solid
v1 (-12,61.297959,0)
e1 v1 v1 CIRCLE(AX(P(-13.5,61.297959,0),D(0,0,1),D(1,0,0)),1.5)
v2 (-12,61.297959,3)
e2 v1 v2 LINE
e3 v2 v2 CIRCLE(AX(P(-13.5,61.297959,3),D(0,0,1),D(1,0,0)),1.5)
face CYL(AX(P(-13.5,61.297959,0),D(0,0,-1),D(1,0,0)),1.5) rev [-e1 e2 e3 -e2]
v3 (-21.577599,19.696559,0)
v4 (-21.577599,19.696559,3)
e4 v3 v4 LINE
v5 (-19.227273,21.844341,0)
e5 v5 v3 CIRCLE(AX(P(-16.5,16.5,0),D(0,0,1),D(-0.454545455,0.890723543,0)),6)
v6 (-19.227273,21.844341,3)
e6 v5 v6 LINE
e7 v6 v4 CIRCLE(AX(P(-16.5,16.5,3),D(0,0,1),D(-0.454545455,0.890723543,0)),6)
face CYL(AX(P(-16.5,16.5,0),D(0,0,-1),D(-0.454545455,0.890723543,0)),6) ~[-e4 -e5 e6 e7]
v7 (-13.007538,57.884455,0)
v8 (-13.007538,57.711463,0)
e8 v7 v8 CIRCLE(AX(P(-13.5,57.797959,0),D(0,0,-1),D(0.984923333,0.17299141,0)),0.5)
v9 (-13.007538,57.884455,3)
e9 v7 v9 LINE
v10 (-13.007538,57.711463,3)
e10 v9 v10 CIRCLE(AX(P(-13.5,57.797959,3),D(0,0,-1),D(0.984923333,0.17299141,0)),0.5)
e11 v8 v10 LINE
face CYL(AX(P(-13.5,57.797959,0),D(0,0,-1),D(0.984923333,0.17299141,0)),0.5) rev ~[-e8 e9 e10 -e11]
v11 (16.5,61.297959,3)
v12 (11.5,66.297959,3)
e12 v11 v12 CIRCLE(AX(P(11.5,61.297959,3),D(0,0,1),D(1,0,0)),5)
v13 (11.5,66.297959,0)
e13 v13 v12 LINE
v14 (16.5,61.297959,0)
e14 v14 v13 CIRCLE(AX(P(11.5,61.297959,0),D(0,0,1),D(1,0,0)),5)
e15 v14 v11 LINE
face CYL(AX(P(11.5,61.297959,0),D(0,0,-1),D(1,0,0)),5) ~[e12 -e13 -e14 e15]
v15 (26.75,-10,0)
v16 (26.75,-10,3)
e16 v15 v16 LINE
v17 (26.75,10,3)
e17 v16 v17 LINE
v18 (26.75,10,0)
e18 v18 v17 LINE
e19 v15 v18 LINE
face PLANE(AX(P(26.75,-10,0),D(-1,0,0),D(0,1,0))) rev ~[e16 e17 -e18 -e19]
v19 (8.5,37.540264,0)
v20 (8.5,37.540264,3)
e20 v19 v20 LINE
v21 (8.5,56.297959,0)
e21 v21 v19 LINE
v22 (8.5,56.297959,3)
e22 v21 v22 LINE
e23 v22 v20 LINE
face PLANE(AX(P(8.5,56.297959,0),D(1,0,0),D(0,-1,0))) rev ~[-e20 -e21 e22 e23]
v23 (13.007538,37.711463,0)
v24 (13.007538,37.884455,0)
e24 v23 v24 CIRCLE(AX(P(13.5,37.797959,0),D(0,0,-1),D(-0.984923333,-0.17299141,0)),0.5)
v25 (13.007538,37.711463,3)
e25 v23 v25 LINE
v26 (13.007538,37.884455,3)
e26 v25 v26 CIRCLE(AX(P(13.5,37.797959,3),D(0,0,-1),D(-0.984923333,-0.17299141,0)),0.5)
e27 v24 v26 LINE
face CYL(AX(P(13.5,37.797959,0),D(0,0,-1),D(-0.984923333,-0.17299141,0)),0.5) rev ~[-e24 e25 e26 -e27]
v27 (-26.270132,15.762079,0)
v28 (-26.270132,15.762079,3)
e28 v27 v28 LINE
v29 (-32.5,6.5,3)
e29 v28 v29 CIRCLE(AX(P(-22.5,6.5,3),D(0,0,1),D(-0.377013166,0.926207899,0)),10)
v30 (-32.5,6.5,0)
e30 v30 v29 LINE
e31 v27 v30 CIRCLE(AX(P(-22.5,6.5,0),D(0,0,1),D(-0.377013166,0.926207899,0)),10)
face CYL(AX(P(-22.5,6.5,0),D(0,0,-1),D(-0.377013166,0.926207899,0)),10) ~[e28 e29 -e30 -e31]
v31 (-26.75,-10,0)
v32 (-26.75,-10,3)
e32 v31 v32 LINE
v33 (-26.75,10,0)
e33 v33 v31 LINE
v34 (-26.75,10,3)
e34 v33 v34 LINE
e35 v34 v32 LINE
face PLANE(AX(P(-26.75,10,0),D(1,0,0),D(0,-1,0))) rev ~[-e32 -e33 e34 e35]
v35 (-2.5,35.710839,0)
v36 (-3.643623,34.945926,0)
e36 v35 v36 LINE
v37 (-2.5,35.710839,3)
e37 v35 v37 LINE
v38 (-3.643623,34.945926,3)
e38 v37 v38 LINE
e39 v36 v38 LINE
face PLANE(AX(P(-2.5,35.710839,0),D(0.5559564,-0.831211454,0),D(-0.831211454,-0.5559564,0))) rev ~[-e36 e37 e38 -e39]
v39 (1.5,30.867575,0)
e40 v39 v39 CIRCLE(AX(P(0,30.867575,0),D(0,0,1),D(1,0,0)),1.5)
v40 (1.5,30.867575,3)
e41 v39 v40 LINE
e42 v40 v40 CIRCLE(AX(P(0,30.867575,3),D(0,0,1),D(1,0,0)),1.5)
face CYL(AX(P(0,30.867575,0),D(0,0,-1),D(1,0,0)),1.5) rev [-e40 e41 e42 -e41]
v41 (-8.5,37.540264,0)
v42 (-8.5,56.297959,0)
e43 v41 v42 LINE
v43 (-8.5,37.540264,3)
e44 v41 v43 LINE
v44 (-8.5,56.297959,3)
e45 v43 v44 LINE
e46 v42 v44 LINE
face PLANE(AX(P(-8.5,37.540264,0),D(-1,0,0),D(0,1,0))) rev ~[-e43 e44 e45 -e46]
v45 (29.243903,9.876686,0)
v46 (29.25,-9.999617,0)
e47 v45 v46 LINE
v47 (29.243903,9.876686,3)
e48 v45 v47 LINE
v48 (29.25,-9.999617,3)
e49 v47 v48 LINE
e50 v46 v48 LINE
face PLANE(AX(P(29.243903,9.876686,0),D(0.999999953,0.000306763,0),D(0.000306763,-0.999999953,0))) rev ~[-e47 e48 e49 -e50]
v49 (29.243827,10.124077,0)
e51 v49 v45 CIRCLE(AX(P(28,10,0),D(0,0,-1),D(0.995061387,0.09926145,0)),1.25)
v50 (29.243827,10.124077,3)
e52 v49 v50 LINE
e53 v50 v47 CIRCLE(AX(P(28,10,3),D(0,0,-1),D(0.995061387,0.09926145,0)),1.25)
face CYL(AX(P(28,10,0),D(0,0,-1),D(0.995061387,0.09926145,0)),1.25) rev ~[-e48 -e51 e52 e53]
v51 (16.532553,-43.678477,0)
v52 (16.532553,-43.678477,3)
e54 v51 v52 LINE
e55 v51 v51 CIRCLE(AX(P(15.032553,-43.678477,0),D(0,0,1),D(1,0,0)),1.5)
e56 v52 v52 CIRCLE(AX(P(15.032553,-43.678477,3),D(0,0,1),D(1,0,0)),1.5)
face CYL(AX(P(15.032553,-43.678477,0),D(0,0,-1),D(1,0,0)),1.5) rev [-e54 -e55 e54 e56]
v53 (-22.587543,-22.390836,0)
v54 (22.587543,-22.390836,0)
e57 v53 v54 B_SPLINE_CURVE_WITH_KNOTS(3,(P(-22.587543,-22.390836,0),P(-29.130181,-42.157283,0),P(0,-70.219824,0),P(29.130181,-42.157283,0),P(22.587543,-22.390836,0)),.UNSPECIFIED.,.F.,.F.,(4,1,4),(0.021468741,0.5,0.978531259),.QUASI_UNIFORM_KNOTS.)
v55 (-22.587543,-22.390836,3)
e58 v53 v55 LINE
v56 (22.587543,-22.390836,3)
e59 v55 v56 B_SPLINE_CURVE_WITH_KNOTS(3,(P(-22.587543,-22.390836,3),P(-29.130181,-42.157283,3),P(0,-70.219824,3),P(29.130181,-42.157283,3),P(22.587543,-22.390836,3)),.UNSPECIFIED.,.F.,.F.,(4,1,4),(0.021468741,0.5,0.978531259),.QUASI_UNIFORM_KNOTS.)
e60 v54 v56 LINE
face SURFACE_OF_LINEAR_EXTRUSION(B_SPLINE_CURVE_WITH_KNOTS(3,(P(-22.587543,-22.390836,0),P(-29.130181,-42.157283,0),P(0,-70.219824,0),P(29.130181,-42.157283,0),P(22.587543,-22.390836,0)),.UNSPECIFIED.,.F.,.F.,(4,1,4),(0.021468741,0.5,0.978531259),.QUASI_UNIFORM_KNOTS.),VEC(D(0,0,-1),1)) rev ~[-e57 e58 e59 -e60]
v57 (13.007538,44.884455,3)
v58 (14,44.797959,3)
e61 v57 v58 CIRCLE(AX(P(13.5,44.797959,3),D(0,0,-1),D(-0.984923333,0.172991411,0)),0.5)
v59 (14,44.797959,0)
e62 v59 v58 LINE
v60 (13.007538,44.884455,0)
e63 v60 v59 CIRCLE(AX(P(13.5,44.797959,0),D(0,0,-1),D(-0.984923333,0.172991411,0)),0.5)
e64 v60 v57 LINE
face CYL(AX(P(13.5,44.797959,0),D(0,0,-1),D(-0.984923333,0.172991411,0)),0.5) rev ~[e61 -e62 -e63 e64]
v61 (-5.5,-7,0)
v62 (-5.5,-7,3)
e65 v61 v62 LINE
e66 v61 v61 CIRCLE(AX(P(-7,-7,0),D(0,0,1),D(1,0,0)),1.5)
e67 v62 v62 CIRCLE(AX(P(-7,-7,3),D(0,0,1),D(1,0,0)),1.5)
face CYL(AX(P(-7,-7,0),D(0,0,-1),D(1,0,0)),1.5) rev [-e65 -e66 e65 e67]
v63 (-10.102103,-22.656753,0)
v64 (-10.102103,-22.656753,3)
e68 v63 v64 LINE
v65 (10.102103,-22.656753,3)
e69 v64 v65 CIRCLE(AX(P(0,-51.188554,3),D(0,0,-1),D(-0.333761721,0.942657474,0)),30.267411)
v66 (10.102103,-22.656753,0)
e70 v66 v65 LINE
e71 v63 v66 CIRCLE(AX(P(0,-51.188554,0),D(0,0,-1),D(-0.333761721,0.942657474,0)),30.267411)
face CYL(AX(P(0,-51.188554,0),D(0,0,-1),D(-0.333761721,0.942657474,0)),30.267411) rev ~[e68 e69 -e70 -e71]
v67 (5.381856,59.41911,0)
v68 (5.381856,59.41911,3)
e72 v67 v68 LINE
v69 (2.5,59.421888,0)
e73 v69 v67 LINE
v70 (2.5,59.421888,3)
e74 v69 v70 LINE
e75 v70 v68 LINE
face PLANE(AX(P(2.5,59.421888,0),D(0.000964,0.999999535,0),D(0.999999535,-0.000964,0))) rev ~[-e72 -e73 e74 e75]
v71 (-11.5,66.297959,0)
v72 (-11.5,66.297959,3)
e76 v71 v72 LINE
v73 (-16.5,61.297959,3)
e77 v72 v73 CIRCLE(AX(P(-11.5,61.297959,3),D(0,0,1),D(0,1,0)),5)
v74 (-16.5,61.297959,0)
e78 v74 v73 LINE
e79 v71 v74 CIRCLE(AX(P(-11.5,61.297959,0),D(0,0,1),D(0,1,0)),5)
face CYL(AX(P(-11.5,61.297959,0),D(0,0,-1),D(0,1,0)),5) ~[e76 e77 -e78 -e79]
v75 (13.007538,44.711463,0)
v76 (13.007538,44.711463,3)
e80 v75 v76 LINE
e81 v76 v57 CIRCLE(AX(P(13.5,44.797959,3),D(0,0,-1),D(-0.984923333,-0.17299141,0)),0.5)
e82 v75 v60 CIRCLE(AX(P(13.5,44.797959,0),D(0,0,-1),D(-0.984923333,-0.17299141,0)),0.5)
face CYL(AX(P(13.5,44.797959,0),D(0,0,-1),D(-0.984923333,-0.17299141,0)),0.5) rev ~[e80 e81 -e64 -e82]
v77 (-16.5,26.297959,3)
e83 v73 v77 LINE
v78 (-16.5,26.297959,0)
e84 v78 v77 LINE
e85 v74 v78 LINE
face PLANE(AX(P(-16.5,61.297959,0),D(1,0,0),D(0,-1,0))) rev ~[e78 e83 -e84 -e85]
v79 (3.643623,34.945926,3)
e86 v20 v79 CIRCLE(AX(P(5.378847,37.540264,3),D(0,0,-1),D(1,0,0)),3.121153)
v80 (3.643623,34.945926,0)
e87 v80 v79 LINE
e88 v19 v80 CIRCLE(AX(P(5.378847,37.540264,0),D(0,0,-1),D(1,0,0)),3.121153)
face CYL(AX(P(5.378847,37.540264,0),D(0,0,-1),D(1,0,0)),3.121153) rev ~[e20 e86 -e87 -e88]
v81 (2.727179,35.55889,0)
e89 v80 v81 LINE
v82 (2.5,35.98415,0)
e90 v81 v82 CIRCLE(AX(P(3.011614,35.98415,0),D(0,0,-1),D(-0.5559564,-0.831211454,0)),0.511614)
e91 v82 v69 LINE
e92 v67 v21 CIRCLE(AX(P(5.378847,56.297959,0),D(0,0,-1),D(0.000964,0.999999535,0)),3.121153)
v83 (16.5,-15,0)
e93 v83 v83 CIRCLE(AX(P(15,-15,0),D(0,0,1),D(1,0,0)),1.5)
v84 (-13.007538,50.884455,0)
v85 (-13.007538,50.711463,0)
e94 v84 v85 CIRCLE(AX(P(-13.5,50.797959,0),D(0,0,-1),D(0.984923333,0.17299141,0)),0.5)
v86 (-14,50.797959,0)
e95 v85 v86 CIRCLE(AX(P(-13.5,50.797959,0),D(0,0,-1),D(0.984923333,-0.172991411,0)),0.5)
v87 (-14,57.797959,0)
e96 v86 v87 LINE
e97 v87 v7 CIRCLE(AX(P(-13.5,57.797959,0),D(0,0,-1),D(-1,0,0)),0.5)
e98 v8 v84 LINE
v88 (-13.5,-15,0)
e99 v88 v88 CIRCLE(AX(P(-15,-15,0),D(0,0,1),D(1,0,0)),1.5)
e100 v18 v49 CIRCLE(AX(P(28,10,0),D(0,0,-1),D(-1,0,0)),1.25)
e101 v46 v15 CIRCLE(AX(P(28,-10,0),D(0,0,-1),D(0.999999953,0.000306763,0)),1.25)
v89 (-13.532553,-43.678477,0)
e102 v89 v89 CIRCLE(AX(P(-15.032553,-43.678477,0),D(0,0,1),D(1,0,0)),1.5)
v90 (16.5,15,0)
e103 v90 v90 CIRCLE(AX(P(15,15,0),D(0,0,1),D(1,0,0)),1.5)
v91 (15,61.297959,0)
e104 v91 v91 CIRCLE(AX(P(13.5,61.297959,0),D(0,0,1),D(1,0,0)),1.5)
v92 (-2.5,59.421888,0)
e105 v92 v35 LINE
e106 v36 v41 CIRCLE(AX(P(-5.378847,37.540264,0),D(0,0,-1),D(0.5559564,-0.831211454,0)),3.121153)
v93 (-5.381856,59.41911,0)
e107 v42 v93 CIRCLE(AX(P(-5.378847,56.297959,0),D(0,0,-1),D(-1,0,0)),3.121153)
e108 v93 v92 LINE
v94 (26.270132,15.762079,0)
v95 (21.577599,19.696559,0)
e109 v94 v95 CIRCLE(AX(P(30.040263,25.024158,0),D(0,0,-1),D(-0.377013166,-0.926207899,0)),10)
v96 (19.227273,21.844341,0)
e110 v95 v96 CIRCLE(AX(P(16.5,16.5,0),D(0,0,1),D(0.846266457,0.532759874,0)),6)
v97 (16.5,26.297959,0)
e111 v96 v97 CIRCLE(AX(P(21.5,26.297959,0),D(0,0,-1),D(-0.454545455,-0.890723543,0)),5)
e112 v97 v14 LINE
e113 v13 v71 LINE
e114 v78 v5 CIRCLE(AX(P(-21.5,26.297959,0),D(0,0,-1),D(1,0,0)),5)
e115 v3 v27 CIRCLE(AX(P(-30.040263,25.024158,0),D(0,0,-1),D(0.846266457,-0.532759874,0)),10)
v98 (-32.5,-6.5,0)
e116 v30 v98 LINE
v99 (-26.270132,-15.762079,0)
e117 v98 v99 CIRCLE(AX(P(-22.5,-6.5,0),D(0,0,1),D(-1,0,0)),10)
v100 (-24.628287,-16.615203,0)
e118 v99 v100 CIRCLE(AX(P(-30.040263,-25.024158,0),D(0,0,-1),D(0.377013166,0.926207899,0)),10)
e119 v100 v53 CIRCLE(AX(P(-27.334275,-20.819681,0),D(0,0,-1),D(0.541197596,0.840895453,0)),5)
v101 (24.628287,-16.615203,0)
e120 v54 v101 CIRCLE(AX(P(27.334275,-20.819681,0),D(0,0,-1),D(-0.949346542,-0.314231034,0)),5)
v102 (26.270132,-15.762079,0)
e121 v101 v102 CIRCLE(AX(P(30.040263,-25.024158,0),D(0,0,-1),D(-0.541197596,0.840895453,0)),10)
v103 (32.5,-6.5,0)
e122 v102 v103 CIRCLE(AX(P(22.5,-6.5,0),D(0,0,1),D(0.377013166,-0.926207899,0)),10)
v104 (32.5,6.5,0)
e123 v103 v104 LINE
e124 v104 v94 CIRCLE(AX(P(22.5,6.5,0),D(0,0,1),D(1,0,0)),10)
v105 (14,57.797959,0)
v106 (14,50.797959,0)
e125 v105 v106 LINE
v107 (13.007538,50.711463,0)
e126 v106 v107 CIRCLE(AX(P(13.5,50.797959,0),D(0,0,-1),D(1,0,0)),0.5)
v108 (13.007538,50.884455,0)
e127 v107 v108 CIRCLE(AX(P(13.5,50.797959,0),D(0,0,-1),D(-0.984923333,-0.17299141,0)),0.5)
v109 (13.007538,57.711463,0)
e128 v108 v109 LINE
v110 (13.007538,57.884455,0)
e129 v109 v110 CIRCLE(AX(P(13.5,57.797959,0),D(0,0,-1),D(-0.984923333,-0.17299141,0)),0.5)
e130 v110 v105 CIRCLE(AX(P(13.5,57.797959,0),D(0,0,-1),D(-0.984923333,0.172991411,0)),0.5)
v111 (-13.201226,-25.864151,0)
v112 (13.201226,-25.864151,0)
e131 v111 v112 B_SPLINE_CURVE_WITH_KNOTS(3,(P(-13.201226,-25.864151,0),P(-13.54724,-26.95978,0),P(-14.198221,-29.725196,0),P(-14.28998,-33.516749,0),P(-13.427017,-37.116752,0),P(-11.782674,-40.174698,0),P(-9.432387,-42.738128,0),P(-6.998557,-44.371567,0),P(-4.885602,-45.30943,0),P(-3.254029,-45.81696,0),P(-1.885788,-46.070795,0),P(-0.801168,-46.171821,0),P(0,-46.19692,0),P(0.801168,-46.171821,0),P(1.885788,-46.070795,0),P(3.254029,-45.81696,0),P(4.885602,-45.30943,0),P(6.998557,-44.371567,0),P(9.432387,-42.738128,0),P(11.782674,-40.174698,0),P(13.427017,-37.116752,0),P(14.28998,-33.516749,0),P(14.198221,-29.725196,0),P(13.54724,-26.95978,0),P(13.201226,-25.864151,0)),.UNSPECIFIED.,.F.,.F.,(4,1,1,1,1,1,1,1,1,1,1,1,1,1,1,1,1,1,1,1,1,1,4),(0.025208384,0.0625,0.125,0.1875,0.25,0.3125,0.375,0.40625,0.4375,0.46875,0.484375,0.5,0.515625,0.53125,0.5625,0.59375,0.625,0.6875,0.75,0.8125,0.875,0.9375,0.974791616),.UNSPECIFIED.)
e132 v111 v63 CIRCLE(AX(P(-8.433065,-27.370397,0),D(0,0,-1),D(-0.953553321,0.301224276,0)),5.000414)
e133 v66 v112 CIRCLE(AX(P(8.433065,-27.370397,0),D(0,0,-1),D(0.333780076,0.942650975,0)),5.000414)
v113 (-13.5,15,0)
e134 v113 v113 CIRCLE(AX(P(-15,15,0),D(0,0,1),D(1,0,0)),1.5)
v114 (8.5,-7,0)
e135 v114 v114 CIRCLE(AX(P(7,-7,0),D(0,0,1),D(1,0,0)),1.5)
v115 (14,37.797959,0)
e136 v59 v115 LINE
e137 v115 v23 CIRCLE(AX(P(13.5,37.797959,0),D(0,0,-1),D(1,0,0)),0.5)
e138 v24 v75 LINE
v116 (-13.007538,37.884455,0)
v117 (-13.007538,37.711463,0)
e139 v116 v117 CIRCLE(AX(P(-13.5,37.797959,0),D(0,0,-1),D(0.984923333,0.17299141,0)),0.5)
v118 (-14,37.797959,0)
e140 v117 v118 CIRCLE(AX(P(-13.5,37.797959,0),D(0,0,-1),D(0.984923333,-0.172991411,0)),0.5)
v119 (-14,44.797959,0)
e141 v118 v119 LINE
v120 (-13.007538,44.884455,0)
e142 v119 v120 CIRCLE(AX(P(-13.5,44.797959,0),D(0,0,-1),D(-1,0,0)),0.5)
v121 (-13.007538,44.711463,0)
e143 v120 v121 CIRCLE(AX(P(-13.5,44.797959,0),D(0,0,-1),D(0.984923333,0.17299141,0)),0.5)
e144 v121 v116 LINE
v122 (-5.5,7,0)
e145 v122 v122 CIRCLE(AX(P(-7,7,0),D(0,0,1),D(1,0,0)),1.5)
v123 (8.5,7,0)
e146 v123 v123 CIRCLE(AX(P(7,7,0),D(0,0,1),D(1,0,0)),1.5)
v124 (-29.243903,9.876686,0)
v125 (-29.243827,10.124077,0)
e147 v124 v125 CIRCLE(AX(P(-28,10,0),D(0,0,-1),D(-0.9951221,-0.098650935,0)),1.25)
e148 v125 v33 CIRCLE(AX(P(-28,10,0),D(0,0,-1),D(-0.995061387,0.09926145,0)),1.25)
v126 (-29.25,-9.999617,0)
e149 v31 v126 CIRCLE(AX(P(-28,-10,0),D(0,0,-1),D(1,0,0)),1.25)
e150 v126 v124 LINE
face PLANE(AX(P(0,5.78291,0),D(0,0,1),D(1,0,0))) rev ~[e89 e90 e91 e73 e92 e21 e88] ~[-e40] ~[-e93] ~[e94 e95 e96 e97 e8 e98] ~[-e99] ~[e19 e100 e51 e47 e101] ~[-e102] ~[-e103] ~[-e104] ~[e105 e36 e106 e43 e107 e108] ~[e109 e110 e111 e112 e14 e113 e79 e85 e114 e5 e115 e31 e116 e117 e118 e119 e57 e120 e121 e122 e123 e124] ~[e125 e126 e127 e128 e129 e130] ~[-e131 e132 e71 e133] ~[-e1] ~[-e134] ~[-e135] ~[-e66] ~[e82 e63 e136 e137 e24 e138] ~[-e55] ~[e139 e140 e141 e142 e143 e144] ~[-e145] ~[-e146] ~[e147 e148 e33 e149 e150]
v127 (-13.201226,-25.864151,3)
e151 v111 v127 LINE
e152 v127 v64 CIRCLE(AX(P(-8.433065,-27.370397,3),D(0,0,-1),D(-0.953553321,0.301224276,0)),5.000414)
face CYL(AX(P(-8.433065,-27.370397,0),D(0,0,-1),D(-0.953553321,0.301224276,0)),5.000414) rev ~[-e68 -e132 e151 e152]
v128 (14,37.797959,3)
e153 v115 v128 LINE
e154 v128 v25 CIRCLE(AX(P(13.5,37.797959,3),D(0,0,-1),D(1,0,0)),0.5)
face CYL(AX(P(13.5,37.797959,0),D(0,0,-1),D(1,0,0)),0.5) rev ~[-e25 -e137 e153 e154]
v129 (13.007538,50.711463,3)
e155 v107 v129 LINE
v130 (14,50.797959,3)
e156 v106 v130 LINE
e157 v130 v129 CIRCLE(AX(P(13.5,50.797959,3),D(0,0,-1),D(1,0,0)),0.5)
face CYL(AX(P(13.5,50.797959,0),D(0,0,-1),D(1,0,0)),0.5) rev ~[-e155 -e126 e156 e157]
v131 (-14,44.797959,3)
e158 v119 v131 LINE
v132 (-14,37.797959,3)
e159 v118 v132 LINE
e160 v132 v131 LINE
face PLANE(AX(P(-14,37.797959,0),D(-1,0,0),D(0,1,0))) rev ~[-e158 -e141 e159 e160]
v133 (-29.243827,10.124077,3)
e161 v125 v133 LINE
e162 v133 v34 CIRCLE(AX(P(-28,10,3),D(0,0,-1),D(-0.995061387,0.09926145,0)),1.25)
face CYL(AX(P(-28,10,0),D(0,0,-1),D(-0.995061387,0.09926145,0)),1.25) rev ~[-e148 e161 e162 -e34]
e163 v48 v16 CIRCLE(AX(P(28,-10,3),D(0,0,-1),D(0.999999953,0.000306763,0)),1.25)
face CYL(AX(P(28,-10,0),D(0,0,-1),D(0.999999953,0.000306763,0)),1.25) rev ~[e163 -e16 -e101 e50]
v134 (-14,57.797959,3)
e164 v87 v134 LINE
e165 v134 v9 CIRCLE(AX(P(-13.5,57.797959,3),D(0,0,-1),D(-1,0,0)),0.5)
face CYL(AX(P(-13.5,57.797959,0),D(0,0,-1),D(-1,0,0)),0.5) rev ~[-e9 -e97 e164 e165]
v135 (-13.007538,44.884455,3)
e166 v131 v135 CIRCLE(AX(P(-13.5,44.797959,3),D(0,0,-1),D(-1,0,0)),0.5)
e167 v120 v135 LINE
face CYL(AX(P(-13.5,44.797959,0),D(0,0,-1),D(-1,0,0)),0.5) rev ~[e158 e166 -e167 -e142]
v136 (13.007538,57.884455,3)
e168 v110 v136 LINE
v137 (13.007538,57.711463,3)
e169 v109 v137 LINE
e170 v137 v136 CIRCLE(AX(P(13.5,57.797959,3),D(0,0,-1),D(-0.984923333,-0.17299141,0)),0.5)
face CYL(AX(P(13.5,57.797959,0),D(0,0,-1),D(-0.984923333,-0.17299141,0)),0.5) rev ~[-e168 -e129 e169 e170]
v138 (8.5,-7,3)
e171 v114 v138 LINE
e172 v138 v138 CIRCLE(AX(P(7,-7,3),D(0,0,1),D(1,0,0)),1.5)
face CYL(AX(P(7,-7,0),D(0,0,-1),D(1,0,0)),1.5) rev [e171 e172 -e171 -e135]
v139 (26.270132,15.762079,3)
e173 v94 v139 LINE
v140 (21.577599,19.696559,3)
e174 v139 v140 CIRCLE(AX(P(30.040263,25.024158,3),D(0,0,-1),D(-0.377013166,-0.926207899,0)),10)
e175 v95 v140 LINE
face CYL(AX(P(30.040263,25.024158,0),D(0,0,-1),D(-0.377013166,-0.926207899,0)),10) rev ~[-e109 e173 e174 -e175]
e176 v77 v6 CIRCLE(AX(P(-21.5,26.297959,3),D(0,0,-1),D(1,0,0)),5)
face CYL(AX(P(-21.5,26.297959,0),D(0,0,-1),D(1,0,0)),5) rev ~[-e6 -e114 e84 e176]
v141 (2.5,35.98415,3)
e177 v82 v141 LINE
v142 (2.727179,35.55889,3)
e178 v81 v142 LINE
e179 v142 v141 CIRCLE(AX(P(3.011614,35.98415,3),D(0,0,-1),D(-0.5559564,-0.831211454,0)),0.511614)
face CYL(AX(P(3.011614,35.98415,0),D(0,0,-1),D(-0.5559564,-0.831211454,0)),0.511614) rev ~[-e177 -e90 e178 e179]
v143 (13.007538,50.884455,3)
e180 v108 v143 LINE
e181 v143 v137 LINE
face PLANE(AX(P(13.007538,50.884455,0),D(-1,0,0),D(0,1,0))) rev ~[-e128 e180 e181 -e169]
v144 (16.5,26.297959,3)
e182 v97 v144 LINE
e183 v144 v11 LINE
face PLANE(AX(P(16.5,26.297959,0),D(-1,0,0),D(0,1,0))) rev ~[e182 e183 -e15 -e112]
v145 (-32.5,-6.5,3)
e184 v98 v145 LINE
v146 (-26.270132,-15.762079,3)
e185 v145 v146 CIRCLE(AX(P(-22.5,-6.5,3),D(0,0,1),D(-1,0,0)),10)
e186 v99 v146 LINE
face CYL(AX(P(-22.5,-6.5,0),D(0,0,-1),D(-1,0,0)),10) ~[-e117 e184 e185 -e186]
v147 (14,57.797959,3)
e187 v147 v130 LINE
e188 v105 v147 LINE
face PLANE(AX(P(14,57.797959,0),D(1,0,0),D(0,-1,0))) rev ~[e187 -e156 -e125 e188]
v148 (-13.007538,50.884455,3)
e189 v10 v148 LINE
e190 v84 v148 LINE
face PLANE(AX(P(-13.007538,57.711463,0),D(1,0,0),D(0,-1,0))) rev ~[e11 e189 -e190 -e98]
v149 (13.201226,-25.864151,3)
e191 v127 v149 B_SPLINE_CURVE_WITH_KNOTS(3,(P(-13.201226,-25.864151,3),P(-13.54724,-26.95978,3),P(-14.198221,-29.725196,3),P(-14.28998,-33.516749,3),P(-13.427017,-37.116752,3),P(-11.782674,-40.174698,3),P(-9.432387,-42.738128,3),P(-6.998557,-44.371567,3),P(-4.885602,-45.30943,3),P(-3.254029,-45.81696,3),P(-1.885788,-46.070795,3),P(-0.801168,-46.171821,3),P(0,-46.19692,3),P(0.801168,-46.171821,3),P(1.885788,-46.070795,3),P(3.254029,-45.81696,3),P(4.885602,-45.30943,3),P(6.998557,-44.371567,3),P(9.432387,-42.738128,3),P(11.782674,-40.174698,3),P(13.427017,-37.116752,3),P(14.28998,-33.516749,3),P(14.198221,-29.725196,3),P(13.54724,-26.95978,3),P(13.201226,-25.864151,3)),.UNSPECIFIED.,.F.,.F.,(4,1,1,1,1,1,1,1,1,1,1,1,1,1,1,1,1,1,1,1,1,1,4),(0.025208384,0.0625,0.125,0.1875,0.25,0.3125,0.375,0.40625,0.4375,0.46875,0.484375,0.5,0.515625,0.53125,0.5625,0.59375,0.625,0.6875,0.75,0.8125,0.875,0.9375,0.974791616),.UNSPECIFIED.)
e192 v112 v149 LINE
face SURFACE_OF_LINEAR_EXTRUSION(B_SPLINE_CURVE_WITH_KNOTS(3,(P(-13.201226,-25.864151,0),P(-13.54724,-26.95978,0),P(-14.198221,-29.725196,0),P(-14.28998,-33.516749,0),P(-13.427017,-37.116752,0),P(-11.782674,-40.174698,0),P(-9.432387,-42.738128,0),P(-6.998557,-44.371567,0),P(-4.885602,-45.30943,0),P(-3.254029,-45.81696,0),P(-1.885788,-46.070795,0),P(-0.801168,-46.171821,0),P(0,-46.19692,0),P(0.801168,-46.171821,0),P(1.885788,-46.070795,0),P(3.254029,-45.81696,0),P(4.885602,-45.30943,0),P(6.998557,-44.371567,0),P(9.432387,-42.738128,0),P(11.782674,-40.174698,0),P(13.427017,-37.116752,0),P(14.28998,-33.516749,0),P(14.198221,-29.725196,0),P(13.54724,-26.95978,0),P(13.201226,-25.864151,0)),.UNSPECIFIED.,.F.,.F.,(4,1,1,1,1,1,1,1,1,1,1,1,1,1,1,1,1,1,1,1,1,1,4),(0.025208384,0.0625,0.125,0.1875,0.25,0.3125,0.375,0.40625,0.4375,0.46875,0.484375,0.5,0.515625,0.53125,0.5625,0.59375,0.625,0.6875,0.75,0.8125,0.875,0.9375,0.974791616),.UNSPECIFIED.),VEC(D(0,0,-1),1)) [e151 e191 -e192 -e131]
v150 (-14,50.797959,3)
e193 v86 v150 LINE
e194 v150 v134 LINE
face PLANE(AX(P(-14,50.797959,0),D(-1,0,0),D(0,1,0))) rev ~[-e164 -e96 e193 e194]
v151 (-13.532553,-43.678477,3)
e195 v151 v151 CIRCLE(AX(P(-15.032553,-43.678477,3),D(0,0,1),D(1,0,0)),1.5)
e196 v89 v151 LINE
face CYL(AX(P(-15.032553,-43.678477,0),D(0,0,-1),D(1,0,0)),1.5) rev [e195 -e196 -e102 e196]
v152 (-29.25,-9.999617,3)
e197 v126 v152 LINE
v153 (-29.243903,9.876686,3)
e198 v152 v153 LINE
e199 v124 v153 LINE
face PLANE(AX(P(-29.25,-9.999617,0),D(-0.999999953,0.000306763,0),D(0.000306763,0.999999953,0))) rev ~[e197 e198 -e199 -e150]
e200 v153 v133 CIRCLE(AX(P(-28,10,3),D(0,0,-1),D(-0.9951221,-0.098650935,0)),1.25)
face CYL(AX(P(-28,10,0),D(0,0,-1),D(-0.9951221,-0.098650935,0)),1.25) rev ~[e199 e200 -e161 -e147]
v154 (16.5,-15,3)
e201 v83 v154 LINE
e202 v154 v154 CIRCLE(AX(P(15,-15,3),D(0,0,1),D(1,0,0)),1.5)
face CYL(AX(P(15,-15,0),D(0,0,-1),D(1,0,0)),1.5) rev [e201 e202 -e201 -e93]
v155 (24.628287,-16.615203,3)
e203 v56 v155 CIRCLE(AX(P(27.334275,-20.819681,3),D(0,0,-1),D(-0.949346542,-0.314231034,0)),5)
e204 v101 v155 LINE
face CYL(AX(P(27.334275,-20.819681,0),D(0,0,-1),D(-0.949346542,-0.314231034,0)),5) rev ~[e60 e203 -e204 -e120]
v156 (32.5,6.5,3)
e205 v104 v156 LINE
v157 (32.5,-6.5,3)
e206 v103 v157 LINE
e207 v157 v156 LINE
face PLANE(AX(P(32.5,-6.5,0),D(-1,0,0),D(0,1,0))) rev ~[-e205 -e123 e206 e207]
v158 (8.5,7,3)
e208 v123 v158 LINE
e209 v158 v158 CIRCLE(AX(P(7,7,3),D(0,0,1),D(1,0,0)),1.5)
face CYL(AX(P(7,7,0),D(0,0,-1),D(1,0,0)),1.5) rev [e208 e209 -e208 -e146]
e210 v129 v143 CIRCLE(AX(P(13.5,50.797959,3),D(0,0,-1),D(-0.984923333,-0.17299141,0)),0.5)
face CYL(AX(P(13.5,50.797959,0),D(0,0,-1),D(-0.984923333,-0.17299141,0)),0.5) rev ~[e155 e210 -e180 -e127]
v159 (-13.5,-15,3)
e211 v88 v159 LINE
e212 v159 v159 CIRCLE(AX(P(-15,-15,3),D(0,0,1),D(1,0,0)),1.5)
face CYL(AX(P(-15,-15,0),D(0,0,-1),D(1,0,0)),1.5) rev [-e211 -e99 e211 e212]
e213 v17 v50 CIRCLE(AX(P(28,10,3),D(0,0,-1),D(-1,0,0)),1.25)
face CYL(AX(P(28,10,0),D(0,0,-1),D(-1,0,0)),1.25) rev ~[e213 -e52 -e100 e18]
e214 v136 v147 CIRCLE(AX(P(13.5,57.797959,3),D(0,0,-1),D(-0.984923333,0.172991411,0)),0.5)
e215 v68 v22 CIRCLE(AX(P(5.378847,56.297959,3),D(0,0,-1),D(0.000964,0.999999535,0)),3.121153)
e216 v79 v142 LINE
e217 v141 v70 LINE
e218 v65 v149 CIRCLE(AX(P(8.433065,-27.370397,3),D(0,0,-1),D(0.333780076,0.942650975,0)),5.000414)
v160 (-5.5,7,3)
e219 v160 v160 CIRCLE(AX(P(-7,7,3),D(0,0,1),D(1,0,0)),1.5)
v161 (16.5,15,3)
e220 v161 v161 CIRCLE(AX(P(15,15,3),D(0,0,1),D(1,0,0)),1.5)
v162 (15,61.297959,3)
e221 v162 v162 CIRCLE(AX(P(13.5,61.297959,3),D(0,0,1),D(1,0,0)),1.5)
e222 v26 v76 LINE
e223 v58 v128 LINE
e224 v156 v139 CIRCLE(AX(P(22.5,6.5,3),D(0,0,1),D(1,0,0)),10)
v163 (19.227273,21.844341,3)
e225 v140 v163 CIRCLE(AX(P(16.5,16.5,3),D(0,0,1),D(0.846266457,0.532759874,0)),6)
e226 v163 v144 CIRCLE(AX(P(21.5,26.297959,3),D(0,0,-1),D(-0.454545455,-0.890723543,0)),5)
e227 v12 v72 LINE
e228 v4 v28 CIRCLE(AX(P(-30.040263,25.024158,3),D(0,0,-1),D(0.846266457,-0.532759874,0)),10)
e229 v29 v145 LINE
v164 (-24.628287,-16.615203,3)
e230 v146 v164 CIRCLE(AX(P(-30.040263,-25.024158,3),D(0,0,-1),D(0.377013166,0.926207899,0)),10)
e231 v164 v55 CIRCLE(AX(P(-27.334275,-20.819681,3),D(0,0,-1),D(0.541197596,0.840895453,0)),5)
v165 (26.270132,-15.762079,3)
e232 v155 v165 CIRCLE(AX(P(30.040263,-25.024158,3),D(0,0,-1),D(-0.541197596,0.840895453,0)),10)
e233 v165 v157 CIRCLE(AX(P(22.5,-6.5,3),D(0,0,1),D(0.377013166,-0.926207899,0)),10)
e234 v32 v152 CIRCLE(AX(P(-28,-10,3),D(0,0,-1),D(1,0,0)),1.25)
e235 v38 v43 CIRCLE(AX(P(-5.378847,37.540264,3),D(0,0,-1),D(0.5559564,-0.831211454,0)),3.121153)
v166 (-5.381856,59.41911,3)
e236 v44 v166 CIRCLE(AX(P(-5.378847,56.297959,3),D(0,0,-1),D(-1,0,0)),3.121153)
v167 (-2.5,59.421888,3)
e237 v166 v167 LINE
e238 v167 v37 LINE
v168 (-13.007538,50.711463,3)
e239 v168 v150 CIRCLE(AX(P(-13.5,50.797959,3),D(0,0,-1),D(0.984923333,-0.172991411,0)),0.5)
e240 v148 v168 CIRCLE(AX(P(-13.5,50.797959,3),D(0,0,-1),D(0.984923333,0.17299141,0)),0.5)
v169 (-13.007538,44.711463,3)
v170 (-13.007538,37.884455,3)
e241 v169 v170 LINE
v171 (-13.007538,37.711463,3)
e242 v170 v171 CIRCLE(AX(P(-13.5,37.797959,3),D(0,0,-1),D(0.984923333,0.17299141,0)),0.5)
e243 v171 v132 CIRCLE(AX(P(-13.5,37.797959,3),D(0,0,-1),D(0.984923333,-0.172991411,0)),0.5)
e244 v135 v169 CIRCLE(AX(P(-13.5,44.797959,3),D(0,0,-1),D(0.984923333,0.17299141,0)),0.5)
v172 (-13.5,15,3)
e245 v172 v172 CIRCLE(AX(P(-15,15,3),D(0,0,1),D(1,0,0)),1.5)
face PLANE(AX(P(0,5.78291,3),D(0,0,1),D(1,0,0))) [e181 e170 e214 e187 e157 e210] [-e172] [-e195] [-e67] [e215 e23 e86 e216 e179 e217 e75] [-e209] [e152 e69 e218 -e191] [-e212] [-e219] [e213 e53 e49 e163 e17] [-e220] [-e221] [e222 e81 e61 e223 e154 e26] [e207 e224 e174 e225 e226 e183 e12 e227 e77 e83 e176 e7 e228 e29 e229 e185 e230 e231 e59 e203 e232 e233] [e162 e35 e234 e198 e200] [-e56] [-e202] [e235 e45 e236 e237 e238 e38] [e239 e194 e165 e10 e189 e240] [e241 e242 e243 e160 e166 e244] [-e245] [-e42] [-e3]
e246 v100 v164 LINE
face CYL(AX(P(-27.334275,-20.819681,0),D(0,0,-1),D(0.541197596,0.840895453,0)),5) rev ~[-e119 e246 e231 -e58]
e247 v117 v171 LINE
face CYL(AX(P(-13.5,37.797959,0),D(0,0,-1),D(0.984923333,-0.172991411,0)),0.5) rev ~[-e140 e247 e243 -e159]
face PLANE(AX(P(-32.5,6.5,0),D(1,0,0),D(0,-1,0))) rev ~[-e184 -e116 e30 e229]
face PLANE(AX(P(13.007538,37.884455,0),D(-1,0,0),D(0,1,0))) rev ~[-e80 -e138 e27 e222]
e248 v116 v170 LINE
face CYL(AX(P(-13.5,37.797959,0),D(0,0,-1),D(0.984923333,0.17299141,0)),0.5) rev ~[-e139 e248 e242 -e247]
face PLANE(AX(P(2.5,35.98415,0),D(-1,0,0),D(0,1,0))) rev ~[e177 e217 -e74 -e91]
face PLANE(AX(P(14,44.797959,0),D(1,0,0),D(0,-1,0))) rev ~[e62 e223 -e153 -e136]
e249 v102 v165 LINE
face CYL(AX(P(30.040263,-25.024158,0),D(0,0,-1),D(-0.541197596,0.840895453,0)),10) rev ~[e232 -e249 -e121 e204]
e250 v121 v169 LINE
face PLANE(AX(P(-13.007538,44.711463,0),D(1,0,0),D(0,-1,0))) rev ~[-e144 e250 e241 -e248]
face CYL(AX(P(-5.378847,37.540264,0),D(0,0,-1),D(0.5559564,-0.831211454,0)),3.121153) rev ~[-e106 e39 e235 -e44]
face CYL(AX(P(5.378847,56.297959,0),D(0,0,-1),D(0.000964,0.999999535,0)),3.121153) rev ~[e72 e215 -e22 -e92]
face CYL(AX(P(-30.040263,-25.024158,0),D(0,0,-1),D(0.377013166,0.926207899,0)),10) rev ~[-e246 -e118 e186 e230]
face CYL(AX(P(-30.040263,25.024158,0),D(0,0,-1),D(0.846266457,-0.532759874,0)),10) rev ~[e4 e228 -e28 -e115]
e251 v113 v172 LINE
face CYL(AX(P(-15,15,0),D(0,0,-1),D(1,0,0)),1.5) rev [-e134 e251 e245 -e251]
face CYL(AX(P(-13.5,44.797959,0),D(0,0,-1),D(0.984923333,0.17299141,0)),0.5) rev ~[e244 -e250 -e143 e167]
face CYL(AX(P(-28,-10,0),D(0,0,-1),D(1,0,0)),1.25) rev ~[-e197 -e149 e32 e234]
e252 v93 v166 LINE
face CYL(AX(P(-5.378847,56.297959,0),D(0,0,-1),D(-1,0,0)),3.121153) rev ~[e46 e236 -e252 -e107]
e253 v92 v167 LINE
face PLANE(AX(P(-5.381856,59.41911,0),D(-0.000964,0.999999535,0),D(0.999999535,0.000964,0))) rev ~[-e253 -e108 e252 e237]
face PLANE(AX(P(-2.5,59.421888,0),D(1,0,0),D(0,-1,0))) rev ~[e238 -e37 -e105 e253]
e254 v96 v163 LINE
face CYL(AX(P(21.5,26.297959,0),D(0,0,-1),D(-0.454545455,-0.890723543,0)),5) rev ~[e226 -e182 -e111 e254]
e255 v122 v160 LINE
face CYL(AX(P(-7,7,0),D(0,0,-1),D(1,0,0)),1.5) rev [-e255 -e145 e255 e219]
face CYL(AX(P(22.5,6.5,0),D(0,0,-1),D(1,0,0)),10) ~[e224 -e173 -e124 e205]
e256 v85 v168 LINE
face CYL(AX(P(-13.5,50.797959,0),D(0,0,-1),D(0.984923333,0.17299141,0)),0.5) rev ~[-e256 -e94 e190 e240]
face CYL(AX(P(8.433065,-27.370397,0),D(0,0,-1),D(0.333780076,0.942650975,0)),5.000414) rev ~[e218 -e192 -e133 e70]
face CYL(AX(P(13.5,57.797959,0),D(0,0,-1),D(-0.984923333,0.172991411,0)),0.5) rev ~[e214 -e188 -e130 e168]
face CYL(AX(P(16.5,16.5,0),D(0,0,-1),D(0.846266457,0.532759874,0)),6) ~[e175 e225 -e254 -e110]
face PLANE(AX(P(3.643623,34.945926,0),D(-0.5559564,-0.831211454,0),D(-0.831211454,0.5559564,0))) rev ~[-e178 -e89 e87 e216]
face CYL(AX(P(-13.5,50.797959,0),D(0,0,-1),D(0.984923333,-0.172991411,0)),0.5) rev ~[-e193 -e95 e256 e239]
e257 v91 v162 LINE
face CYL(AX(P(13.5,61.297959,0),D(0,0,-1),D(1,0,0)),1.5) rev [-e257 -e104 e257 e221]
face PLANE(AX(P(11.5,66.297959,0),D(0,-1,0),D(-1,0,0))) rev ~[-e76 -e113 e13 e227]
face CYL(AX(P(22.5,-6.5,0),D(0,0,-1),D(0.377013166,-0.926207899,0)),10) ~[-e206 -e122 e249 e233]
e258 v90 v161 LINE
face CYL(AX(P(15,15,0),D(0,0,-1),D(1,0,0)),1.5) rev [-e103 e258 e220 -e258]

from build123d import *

# Parameters (mm, degrees)
F0_R     = 1.5
F1_DEPTH = 3


# Not quite as in the source:
# - ends of sketch curves that miss each other by under 0.0002 mm in the source are joined
# - the dataset's text gives a spline's control points without its knots; the knots are read off the source's solid
# - a feature names something its author has since deleted; it is built from what else it names


with BuildPart() as f1:
    # F0 (on Top) → F1 (new body)
    with BuildSketch(Plane.XY):
        with BuildLine():
            ThreePointArc((-16.5, 26.2979589711), (-17.2359856729, 23.6867941318), (-19.2272727273, 21.844341257))
            ThreePointArc((-19.2272727273, 21.844341257), (-20.5474988026, 20.9291933174), (-21.5775987425, 19.6965592455))
            ThreePointArc((-21.5775987425, 19.6965592455), (-23.6152839672, 17.3612838274), (-26.2701316567, 15.762078994))
            ThreePointArc((-26.2701316567, 15.762078994), (-30.7976296786, 12.0811595315), (-32.5, 6.5))
            Line((-32.5, 6.5), (-32.5, -6.5))
            ThreePointArc((-32.5, -6.5), (-30.7976296786, -12.0811595315), (-26.2701316567, -15.762078994))
            ThreePointArc((-26.2701316567, -15.762078994), (-25.4294357942, -16.1505865769), (-24.6282873533, -16.6152034628))
            ThreePointArc((-24.6282873533, -16.6152034628), (-22.6199096362, -19.1539208167), (-22.5875426225, -22.3908358966))
            add(Edge.make_bspline(
                [(-22.5875426225, -22.3908358966), (-29.1301810286, -42.1572830984), (0, -70.219824045), (29.1301810286, -42.1572830984), (22.5875426225, -22.3908358966)],
                knots=[0.0214687415, 0.0214687415, 0.0214687415, 0.0214687415, 0.5, 0.9785312585, 0.9785312585, 0.9785312585, 0.9785312585], degree=3))
            ThreePointArc((22.5875426225, -22.3908358966), (22.6199096362, -19.1539208167), (24.6282873533, -16.6152034628))
            ThreePointArc((24.6282873533, -16.6152034628), (25.4294357942, -16.1505865769), (26.2701316567, -15.762078994))
            ThreePointArc((26.2701316567, -15.762078994), (30.7976296786, -12.0811595315), (32.5, -6.5))
            Line((32.5, -6.5), (32.5, 6.5))
            ThreePointArc((32.5, 6.5), (30.7976296786, 12.0811595315), (26.2701316567, 15.762078994))
            ThreePointArc((26.2701316567, 15.762078994), (23.6152839672, 17.3612838274), (21.5775987425, 19.6965592455))
            ThreePointArc((21.5775987425, 19.6965592455), (20.5474988026, 20.9291933174), (19.2272727273, 21.844341257))
            ThreePointArc((19.2272727273, 21.844341257), (17.2359856729, 23.6867941318), (16.5, 26.2979589711))
            Line((16.5, 26.2979589711), (16.5, 61.2979589711))
            ThreePointArc((16.5, 61.2979589711), (15.0355339059, 64.8334928771), (11.5, 66.2979589711))
            Line((11.5, 66.2979589711), (-11.5, 66.2979589711))
            ThreePointArc((-11.5, 66.2979589711), (-15.0355339059, 64.8334928771), (-16.5, 61.2979589711))
            Line((-16.5, 61.2979589711), (-16.5, 26.2979589711))
        make_face()
        with Locations((-15.0325534991, -43.6784773437)):
            Circle(F0_R, mode=Mode.SUBTRACT)
        with Locations((-15, -15)):
            Circle(F0_R, mode=Mode.SUBTRACT)
        with Locations((-7, -7)):
            Circle(F0_R, mode=Mode.SUBTRACT)
        with Locations((15.0325534991, -43.6784773437)):
            Circle(F0_R, mode=Mode.SUBTRACT)
        with BuildLine():
            add(Edge.make_bspline(
                [(-13.2012257299, -25.8641514574), (-13.5472396089, -26.9597800065), (-14.1982208527, -29.7251957669), (-14.2899795625, -33.516748506), (-13.4270170307, -37.1167515894), (-11.7826738762, -40.1746977582), (-9.4323870949, -42.738127647), (-6.9985568447, -44.3715674999), (-4.8856018995, -45.3094299923), (-3.2540288337, -45.816960105), (-1.8857880841, -46.0707953295), (-0.8011676511, -46.1718209221), (0, -46.1969198965), (0.8011676511, -46.1718209221), (1.8857880841, -46.0707953295), (3.2540288337, -45.816960105), (4.8856018995, -45.3094299923), (6.9985568447, -44.3715674999), (9.4323870949, -42.738127647), (11.7826738762, -40.1746977582), (13.4270170307, -37.1167515894), (14.2899795625, -33.516748506), (14.1982208527, -29.7251957669), (13.5472396089, -26.9597800065), (13.2012257299, -25.8641514574)],
                knots=[0.0252083838, 0.0252083838, 0.0252083838, 0.0252083838, 0.0625, 0.125, 0.1875, 0.25, 0.3125, 0.375, 0.40625, 0.4375, 0.46875, 0.484375, 0.5, 0.515625, 0.53125, 0.5625, 0.59375, 0.625, 0.6875, 0.75, 0.8125, 0.875, 0.9375, 0.9747916162, 0.9747916162, 0.9747916162, 0.9747916162], degree=3))
            ThreePointArc((-13.2012257299, -25.8641514574), (-12.0290603688, -23.8957820907), (-10.1021030975, -22.656752593))
            ThreePointArc((-10.1021030975, -22.656752593), (0, -20.9211428123), (10.1021030975, -22.656752593))
            ThreePointArc((10.1021030975, -22.656752593), (12.0290603688, -23.8957820907), (13.2012257299, -25.8641514574))
        make_face(mode=Mode.SUBTRACT)
        with Locations((7, -7)):
            Circle(F0_R, mode=Mode.SUBTRACT)
        with Locations((15, -15)):
            Circle(F0_R, mode=Mode.SUBTRACT)
        with BuildLine():
            ThreePointArc((-29.2438267342, 10.1240768122), (-27.9378848559, 11.2484557296), (-26.75, 10))
            Line((-26.75, 10), (-26.75, -10))
            ThreePointArc((-26.75, -10), (-28.0001917269, -11.2499999853), (-29.2499999412, -9.9996165461))
            Line((-29.2499999412, -9.9996165461), (-29.2439026245, 9.8766863315))
            ThreePointArc((-29.2439026245, 9.8766863315), (-29.2499999412, 10.0003834539), (-29.2438267342, 10.1240768122))
        make_face(mode=Mode.SUBTRACT)
        with Locations((-15, 15)):
            Circle(F0_R, mode=Mode.SUBTRACT)
        with Locations((-7, 7)):
            Circle(F0_R, mode=Mode.SUBTRACT)
        with BuildLine():
            Line((-13.0075383335, 44.7114632656), (-13.0075383335, 37.8844546767))
            ThreePointArc((-13.0075383335, 37.8844546767), (-13, 37.7979589711), (-13.0075383335, 37.7114632656))
            ThreePointArc((-13.0075383335, 37.7114632656), (-13.5434117886, 37.2998471196), (-14, 37.7979589711))
            Line((-14, 37.7979589711), (-14, 44.7979589711))
            ThreePointArc((-14, 44.7979589711), (-13.5434117886, 45.2960708226), (-13.0075383335, 44.8844546767))
            ThreePointArc((-13.0075383335, 44.8844546767), (-13, 44.7979589711), (-13.0075383335, 44.7114632656))
        make_face(mode=Mode.SUBTRACT)
        with BuildLine():
            Line((-8.5, 37.5402642858), (-8.5, 56.2979589711))
            ThreePointArc((-8.5, 56.2979589711), (-7.5868990636, 58.5038831557), (-5.3818561331, 59.4191101782))
            Line((-5.3818561331, 59.4191101782), (-2.5, 59.4218882881))
            Line((-2.5, 59.4218882881), (-2.5, 35.7108392399))
            Line((-2.5, 35.7108392399), (-3.6436225473, 34.9459264474))
            ThreePointArc((-3.6436225473, 34.9459264474), (-6.8495091714, 34.7873117443), (-8.5, 37.5402642858))
        make_face(mode=Mode.SUBTRACT)
        with BuildLine():
            Line((-14, 50.7979589711), (-14, 57.7979589711))
            ThreePointArc((-14, 57.7979589711), (-13.5434117886, 58.2960708226), (-13.0075383335, 57.8844546767))
            ThreePointArc((-13.0075383335, 57.8844546767), (-13, 57.7979589711), (-13.0075383335, 57.7114632656))
            Line((-13.0075383335, 57.7114632656), (-13.0075383335, 50.8844546767))
            ThreePointArc((-13.0075383335, 50.8844546767), (-13, 50.7979589711), (-13.0075383335, 50.7114632656))
            ThreePointArc((-13.0075383335, 50.7114632656), (-13.5434117886, 50.2998471196), (-14, 50.7979589711))
        make_face(mode=Mode.SUBTRACT)
        with Locations((-13.5, 61.2979589711)):
            Circle(F0_R, mode=Mode.SUBTRACT)
        with Locations((7, 7)):
            Circle(F0_R, mode=Mode.SUBTRACT)
        with Locations((15, 15)):
            Circle(F0_R, mode=Mode.SUBTRACT)
        with Locations((0, 30.8675747365)):
            Circle(F0_R, mode=Mode.SUBTRACT)
        with BuildLine():
            ThreePointArc((29.2438267342, 10.1240768122), (29.2499999412, 10.0003834539), (29.2439026245, 9.8766863315))
            Line((29.2439026245, 9.8766863315), (29.2499999412, -9.9996165461))
            ThreePointArc((29.2499999412, -9.9996165461), (28.0001917269, -11.2499999853), (26.75, -10))
            Line((26.75, -10), (26.75, 10))
            ThreePointArc((26.75, 10), (27.9378848559, 11.2484557296), (29.2438267342, 10.1240768122))
        make_face(mode=Mode.SUBTRACT)
        with BuildLine():
            ThreePointArc((2.7271789356, 35.5588904396), (2.5603547361, 35.743081498), (2.5, 35.9841498812))
            Line((2.5, 35.9841498812), (2.5, 59.4218882881))
            Line((2.5, 59.4218882881), (5.3818561331, 59.4191101782))
            ThreePointArc((5.3818561331, 59.4191101782), (7.5868990636, 58.5038831557), (8.5, 56.2979589711))
            Line((8.5, 56.2979589711), (8.5, 37.5402642858))
            ThreePointArc((8.5, 37.5402642858), (6.8495091714, 34.7873117443), (3.6436225473, 34.9459264474))
            Line((3.6436225473, 34.9459264474), (2.7271789356, 35.5588904396))
        make_face(mode=Mode.SUBTRACT)
        with BuildLine():
            ThreePointArc((13.0075383335, 37.7114632656), (13, 37.7979589711), (13.0075383335, 37.8844546767))
            Line((13.0075383335, 37.8844546767), (13.0075383335, 44.7114632656))
            ThreePointArc((13.0075383335, 44.7114632656), (13, 44.7979589711), (13.0075383335, 44.8844546767))
            ThreePointArc((13.0075383335, 44.8844546767), (13.5434117886, 45.2960708226), (14, 44.7979589711))
            Line((14, 44.7979589711), (14, 37.7979589711))
            ThreePointArc((14, 37.7979589711), (13.5434117886, 37.2998471196), (13.0075383335, 37.7114632656))
        make_face(mode=Mode.SUBTRACT)
        with BuildLine():
            ThreePointArc((13.0075383335, 57.8844546767), (13.5434117886, 58.2960708226), (14, 57.7979589711))
            Line((14, 57.7979589711), (14, 50.7979589711))
            ThreePointArc((14, 50.7979589711), (13.5434117886, 50.2998471196), (13.0075383335, 50.7114632656))
            ThreePointArc((13.0075383335, 50.7114632656), (13, 50.7979589711), (13.0075383335, 50.8844546767))
            Line((13.0075383335, 50.8844546767), (13.0075383335, 57.7114632656))
            ThreePointArc((13.0075383335, 57.7114632656), (13, 57.7979589711), (13.0075383335, 57.8844546767))
        make_face(mode=Mode.SUBTRACT)
        with Locations((13.5, 61.2979589711)):
            Circle(F0_R, mode=Mode.SUBTRACT)
    extrude(amount=F1_DEPTH)


solid = f1.part
